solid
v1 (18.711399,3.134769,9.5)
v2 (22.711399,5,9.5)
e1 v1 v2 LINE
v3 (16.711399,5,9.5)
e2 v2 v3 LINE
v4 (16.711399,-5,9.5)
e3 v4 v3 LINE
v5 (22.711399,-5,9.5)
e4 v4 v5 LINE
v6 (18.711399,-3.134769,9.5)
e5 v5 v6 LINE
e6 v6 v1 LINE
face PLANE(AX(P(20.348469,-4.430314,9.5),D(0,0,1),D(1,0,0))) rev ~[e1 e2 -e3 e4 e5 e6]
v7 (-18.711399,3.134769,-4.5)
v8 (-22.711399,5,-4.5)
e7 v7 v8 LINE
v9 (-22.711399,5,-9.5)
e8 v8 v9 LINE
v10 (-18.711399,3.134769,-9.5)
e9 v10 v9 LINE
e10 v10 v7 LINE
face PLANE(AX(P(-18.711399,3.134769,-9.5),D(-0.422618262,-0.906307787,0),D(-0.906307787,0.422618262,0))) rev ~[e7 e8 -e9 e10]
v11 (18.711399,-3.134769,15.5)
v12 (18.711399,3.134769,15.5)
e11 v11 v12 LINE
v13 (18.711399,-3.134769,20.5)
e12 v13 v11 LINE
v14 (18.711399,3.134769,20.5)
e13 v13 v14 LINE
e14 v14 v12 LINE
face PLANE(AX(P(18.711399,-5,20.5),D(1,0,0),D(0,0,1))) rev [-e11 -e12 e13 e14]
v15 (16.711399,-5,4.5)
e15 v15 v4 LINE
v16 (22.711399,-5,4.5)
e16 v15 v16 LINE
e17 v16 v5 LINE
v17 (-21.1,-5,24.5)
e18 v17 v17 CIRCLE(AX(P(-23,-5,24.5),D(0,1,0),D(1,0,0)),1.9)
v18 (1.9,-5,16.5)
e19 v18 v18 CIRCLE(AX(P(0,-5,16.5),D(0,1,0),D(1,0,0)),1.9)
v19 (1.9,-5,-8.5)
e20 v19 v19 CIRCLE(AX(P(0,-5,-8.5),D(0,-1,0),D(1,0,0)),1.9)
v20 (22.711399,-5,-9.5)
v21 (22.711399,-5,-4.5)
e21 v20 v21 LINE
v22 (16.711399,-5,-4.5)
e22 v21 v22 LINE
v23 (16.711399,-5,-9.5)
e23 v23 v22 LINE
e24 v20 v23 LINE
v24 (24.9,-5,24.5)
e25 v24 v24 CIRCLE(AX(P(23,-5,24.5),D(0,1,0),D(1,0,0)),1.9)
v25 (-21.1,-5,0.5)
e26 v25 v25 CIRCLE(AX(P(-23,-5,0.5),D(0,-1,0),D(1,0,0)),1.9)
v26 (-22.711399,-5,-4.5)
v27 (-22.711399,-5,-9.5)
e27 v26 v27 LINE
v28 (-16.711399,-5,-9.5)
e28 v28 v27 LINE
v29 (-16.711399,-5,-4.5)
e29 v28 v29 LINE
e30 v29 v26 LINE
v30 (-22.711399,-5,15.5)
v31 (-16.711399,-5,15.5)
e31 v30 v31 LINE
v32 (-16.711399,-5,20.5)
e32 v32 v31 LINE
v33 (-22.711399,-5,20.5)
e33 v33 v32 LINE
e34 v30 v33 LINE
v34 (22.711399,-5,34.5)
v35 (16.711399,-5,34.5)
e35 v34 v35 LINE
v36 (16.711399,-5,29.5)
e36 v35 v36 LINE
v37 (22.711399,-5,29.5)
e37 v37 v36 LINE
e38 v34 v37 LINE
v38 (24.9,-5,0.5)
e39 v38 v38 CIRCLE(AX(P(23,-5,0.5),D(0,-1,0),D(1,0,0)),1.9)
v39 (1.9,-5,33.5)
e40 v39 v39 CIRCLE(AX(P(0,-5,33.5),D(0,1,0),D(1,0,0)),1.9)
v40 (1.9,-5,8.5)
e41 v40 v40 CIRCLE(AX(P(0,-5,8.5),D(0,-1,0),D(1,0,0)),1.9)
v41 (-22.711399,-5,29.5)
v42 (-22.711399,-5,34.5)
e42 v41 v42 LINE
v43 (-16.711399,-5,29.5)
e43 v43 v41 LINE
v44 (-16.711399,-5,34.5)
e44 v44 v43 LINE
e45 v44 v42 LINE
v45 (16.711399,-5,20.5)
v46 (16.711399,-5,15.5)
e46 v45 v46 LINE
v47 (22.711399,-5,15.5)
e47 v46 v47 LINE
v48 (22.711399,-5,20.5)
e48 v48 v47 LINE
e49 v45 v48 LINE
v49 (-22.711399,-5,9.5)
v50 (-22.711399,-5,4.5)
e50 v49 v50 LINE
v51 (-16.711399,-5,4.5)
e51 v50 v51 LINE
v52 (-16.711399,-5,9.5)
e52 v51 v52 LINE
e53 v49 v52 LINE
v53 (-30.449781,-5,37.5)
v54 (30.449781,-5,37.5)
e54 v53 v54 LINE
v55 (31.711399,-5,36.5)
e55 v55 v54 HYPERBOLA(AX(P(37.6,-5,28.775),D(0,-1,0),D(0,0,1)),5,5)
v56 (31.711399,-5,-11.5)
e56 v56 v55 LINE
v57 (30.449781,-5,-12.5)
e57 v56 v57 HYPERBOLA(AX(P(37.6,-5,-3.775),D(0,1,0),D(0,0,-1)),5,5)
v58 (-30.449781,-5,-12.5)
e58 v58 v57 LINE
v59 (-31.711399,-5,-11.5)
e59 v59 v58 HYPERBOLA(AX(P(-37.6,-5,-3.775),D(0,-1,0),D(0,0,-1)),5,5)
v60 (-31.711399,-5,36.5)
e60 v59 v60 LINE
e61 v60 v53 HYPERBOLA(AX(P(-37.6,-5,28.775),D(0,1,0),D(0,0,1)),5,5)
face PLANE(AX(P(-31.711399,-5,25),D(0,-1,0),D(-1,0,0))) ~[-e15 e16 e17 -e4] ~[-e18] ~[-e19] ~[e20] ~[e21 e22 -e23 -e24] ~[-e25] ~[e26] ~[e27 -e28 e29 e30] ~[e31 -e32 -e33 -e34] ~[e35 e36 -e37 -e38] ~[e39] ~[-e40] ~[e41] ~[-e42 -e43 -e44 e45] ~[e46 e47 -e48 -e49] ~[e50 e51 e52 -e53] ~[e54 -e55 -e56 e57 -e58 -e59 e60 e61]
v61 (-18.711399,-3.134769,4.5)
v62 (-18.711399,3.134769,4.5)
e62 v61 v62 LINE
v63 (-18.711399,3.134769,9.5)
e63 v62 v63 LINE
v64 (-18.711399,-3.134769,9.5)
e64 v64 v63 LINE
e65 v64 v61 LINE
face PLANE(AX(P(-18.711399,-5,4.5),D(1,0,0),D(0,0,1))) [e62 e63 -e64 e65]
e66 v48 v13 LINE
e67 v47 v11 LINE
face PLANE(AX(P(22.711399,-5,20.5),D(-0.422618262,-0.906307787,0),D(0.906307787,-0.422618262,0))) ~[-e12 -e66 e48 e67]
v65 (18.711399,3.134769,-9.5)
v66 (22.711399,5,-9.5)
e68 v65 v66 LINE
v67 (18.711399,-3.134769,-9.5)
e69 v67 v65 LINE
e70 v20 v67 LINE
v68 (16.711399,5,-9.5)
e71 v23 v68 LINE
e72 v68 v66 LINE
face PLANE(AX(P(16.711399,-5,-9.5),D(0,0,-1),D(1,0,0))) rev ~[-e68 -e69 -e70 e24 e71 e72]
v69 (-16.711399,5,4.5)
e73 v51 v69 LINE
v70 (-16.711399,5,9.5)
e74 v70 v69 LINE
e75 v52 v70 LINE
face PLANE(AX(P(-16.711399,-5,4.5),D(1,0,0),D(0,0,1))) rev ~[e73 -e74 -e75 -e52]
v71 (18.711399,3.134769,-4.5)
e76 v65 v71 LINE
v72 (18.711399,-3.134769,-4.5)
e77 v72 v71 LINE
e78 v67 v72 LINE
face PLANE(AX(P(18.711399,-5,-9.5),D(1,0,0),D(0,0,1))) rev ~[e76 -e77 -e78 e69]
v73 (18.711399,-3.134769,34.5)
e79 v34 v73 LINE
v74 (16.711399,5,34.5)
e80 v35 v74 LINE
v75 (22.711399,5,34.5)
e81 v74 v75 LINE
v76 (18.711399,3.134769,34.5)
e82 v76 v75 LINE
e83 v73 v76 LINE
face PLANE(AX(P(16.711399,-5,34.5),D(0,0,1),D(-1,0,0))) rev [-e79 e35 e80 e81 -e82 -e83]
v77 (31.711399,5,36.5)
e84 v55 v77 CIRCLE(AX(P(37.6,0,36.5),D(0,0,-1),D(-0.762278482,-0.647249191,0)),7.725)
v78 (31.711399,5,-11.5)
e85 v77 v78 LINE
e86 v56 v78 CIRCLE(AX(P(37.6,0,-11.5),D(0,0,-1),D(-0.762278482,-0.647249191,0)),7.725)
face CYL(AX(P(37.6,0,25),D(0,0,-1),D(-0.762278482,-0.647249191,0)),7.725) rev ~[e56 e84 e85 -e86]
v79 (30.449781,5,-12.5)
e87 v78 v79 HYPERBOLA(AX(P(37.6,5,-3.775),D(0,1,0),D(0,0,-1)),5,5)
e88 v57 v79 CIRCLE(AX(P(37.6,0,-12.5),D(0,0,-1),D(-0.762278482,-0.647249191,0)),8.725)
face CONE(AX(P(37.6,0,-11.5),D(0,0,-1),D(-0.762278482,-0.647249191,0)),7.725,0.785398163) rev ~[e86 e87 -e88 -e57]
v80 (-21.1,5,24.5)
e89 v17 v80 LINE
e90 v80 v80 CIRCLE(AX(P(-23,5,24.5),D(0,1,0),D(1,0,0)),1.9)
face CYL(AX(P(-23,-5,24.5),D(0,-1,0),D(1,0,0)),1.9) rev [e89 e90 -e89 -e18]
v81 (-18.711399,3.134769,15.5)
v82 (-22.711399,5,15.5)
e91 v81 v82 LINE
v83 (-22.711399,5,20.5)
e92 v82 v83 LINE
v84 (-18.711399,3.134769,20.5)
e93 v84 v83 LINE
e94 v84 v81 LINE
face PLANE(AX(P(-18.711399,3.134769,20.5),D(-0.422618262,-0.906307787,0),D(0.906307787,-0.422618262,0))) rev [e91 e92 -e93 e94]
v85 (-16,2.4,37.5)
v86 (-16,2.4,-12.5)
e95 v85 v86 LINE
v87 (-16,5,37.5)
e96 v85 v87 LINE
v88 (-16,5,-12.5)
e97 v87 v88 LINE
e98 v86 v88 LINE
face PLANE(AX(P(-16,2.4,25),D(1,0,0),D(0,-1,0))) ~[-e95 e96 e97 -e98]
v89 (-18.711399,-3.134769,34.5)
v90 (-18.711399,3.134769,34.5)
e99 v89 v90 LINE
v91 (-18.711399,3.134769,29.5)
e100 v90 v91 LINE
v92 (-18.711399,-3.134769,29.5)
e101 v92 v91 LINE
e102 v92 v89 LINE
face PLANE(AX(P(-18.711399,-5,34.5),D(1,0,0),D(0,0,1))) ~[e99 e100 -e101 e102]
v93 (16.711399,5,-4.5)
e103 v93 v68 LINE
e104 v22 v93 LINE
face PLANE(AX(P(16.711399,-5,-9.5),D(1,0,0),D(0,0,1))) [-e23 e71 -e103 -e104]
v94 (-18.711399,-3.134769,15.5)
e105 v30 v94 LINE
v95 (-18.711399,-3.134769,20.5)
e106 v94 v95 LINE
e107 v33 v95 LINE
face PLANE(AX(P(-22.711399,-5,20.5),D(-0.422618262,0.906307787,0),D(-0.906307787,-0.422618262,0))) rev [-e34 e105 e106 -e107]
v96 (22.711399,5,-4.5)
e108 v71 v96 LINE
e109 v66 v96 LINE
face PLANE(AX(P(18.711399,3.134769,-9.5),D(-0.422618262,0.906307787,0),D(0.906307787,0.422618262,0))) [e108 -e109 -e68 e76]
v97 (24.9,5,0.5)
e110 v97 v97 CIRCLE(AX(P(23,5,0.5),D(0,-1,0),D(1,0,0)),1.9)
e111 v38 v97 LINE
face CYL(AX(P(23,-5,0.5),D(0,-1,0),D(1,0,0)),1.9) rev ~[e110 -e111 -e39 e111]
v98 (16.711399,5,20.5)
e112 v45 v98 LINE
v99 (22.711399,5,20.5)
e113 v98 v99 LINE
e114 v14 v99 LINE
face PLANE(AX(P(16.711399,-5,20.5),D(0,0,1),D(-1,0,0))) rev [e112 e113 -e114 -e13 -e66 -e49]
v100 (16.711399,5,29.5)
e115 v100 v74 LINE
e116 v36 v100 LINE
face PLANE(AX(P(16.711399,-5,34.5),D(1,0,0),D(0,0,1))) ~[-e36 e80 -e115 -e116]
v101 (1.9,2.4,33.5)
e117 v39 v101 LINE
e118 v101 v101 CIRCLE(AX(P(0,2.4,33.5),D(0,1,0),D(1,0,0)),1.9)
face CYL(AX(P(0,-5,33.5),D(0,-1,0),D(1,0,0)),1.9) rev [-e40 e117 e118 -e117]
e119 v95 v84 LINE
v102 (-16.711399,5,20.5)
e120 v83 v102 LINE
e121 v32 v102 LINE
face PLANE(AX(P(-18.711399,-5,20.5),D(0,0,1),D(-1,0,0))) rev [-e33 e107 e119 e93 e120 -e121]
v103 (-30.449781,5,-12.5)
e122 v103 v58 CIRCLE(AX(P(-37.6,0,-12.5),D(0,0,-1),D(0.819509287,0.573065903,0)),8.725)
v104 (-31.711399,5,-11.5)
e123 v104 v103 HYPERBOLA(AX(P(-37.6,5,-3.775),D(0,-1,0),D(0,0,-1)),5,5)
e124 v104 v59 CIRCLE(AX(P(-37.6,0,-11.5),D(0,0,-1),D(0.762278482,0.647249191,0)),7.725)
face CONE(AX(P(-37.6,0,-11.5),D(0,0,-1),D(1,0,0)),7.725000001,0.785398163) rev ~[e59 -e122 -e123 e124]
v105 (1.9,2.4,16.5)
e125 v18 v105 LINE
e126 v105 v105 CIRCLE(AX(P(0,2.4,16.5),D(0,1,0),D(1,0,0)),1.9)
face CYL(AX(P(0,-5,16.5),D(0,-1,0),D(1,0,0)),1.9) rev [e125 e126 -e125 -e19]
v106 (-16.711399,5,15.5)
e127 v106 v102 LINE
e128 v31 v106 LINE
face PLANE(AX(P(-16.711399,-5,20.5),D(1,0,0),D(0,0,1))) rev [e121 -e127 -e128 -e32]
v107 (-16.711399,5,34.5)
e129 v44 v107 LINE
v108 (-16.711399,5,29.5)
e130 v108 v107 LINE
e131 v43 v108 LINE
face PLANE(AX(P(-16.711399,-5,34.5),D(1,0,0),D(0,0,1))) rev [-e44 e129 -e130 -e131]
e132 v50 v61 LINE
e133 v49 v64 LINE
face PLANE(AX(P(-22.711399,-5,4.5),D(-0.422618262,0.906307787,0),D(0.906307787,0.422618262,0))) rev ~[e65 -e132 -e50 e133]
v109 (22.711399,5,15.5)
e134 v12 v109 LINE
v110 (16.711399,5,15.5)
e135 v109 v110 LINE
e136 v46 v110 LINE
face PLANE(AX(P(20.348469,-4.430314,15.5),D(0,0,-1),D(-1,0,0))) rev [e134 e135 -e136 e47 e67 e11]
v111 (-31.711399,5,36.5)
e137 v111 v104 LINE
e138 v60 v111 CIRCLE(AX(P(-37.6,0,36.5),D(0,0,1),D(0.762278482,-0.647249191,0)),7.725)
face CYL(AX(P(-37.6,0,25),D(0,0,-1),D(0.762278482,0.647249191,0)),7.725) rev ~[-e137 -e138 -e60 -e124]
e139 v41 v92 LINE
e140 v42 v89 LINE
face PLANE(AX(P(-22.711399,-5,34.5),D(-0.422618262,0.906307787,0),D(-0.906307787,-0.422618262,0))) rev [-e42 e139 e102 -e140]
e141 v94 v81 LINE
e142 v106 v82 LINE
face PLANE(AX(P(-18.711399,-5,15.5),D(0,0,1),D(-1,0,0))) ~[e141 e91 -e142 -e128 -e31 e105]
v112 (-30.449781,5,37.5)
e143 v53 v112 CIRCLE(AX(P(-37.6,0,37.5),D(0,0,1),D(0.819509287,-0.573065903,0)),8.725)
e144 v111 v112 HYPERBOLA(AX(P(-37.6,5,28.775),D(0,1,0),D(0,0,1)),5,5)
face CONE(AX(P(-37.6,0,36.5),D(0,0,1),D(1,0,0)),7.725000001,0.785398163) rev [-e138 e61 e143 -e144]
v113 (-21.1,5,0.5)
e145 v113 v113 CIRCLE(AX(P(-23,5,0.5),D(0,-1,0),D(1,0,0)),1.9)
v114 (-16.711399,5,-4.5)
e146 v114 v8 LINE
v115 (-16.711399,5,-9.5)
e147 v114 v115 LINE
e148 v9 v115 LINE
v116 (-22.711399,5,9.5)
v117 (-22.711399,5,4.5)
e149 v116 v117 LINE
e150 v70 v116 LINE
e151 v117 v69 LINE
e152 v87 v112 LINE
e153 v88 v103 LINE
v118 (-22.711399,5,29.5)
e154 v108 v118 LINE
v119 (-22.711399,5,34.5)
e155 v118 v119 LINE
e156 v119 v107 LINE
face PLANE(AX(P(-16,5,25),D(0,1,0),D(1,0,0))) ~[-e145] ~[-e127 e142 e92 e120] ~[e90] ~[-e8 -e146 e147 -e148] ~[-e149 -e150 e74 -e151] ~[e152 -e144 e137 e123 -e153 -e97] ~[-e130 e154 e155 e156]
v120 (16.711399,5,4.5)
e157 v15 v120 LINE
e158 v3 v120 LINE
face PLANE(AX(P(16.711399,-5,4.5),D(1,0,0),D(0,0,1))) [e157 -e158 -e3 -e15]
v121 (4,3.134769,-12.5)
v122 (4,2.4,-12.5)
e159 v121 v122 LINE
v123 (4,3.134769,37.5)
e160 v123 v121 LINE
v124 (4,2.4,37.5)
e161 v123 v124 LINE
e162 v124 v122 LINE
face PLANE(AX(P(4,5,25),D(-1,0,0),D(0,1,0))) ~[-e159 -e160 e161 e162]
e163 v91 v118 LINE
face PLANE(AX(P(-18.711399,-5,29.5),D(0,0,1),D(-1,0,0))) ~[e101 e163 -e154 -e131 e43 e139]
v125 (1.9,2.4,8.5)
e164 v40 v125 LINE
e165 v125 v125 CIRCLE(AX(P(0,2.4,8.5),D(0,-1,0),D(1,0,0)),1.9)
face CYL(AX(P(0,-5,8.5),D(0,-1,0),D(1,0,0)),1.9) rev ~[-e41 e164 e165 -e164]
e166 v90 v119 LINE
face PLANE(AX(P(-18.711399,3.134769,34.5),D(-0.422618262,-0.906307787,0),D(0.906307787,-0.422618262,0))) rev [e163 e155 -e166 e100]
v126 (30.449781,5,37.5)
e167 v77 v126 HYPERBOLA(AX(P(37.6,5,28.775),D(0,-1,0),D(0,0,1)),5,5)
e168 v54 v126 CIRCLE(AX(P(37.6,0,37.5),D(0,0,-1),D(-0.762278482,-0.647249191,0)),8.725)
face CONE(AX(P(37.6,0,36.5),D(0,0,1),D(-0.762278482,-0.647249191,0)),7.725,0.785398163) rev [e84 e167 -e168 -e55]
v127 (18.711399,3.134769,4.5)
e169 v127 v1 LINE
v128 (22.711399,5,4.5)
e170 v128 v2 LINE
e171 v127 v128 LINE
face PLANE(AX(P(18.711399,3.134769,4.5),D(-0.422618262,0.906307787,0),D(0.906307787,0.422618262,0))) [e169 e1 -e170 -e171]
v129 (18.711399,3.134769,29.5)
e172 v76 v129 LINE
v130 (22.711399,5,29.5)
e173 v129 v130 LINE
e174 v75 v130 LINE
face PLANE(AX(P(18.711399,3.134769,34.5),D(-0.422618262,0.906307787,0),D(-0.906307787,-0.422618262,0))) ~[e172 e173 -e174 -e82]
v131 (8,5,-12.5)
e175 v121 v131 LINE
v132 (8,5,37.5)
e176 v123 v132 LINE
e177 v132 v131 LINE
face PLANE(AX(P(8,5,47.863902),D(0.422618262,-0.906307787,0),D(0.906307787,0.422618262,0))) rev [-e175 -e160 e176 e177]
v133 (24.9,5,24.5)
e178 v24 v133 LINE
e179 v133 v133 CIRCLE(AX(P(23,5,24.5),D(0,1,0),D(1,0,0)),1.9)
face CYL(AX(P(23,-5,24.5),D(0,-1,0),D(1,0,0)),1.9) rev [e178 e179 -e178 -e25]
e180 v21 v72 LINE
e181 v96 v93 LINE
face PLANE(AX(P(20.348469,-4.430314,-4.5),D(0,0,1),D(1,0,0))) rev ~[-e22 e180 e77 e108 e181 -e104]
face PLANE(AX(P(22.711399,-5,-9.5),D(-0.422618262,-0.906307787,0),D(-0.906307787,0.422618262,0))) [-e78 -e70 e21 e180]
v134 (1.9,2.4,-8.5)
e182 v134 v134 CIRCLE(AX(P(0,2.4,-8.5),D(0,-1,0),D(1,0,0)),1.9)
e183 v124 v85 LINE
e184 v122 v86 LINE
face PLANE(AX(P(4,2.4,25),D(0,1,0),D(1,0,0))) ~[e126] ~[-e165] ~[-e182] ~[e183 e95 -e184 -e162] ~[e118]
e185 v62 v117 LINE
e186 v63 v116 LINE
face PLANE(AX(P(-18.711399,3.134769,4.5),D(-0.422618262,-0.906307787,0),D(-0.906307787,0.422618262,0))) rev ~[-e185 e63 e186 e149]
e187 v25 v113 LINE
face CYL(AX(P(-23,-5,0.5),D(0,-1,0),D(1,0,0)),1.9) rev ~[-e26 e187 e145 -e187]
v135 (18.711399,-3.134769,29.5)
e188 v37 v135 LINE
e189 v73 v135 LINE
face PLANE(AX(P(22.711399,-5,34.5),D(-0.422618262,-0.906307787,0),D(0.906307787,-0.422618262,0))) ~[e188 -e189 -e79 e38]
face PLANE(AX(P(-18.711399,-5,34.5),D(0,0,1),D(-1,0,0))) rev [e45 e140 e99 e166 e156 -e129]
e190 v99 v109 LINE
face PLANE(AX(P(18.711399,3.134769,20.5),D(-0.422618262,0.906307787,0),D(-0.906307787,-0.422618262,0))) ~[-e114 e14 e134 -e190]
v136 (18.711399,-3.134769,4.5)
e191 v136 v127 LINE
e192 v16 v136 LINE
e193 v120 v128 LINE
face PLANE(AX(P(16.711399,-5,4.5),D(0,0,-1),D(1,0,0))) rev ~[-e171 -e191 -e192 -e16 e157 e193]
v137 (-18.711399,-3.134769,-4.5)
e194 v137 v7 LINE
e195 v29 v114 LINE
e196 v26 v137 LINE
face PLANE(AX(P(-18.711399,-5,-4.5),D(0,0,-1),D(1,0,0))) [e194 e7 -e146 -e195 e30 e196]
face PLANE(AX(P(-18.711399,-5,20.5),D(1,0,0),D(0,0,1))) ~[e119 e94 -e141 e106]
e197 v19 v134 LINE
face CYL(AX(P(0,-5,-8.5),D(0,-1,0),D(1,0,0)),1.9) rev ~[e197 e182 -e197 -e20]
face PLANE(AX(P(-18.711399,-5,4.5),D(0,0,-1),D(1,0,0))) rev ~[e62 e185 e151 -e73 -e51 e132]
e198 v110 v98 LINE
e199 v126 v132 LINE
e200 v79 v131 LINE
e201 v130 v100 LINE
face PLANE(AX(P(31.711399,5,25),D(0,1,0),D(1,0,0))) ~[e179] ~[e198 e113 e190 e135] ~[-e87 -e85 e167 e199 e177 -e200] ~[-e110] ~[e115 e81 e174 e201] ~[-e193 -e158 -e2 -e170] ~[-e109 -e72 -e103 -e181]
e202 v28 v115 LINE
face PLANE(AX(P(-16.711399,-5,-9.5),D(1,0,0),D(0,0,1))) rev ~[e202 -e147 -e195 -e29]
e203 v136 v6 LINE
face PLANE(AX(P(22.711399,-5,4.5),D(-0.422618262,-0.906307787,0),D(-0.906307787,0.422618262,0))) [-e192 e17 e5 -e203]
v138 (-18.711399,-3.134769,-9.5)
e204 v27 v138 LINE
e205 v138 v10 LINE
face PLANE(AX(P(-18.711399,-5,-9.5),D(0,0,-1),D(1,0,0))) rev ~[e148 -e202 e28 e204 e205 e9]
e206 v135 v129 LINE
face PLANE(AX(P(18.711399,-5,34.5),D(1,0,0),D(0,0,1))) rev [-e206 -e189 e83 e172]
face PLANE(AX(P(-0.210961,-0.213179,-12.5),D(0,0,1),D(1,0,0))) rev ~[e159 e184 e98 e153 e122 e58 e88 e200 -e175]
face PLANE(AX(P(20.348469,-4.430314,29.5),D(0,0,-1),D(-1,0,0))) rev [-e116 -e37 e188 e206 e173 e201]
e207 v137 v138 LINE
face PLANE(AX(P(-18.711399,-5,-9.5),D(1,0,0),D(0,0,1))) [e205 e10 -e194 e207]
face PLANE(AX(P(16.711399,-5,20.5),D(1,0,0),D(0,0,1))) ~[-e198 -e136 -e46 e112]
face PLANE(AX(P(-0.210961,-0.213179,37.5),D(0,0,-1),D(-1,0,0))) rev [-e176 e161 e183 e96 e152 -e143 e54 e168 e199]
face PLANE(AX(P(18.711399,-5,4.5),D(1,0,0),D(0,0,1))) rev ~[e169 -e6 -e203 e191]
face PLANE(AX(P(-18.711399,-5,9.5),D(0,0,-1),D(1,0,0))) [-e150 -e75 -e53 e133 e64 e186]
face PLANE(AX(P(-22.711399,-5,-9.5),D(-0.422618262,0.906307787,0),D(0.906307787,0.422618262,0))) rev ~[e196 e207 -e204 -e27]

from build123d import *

# Parameters (mm, degrees)
F1_DEPTH     = 12.5
F2_R         = 1.9
F2_W         = 2
F2_H         = 5
F3_DEPTH     = 25
F5_T1_DEPTH  = 5
F5_T3_DEPTH  = 5
F5_T5_DEPTH  = 22.8639018857
F5_T7_DEPTH  = 22.8639018857
F5_T12_DEPTH = 25.7278037714
F5_T17_DEPTH = 25.7278037714
F5_T22_DEPTH = 25.7278037714
F5_T27_DEPTH = 25.7278037714
F5_T32_DEPTH = 25.7278037714
F5_T37_DEPTH = 25.7278037714
F5_T42_DEPTH = 25.7278037714
F5_T47_DEPTH = 25.7278037714
F10_SIZE     = 1


# Not quite as in the source:
# - a fillet or chamfer that OpenCascade refuses, or shapes differently, is made with other operations: its cross-section is extruded or revolved along the edge and cut away or added
# - two fillets or chamfers of one size are made in one step


with BuildPart() as f1:
    # F0 (on Top) → F1 (new body, symmetric)
    with BuildSketch(Plane.XY):
        with BuildLine():
            ThreePointArc((-31.711398723, 5), (-30.3486184122, 2.6632855775), (-29.875, 0))
            ThreePointArc((-29.875, 0), (-30.3486184122, -2.6632855775), (-31.711398723, -5))
            Line((-31.711398723, -5), (31.711398723, -5))
            ThreePointArc((31.711398723, -5), (29.875, 0), (31.711398723, 5))
            Line((31.711398723, 5), (4, 5))
            Line((4, 5), (4, 2.4))
            Line((4, 2.4), (-16, 2.4))
            Line((-16, 2.4), (-16, 5))
            Line((-16, 5), (-31.711398723, 5))
        make_face()
    extrude(amount=F1_DEPTH, both=True)

    # F2 (on face) → F3 (cut)
    with BuildSketch(Plane.XZ.offset(5)):
        with Locations((0, 8.5)):
            Circle(F2_R)
        with Locations((0, -8.5)):
            Circle(F2_R)
        with Locations((-17.711398723, 7)):
            Rectangle(F2_W, F2_H)
        with Locations((-17.711398723, -7)):
            Rectangle(F2_W, F2_H)
        with Locations((17.711398723, 7)):
            Rectangle(F2_W, F2_H)
        with Locations((17.711398723, -7)):
            Rectangle(F2_W, F2_H)
        with Locations((-23, 0.5)):
            Circle(F2_R)
        with Locations((23, 0.5)):
            Circle(F2_R)
    extrude(amount=-F3_DEPTH, mode=Mode.SUBTRACT)

    # F5: chamfer of 4 x 1.8652306326 on 10 edges, made by hand

    # F5_s2 → F5_t1 (cut)
    with BuildSketch(Plane.XY.offset(-9.5)):
        Polygon((22.711398723, -5), (18.711398723, -3.1347693674), (18.711398723, -5), align=None)
        Polygon((-22.711398723, -5), (-18.711398723, -3.1347693674), (-18.711398723, -5), align=None)
        Polygon((-18.711398723, 3.1347693674), (-22.711398723, 5), (-18.711398723, 5), align=None)
        Polygon((18.711398723, 3.1347693674), (22.711398723, 5), (18.711398723, 5), align=None)
    extrude(amount=F5_T1_DEPTH, mode=Mode.SUBTRACT)

    # F5_s4 → F5_t3 (cut)
    with BuildSketch(Plane.XY.offset(4.5)):
        Polygon((22.711398723, -5), (18.711398723, -3.1347693674), (18.711398723, -5), align=None)
        Polygon((-22.711398723, -5), (-18.711398723, -3.1347693674), (-18.711398723, -5), align=None)
        Polygon((-18.711398723, 3.1347693674), (-22.711398723, 5), (-18.711398723, 5), align=None)
        Polygon((18.711398723, 3.1347693674), (22.711398723, 5), (18.711398723, 5), align=None)
    extrude(amount=F5_T3_DEPTH, mode=Mode.SUBTRACT)

    # F5_s6 → F5_t5 (cut)
    with BuildSketch(Plane.XY.offset(-22.8639018857)):
        Polygon((8, 5), (4, 3.1347693674), (4, 5), align=None)
    extrude(amount=F5_T5_DEPTH, mode=Mode.SUBTRACT)

    # F5_s8 → F5_t7 (cut)
    with BuildSketch(Plane.XY):
        Polygon((8, 5), (4, 3.1347693674), (4, 5), align=None)
    extrude(amount=F5_T7_DEPTH, mode=Mode.SUBTRACT)


with BuildPart() as f5_tool10:
    # F5_s11 → F5_t12 (new body)
    with BuildSketch(Plane.XY.offset(-19.8639018857)):
        Polygon((22.711398723, -5), (18.711398723, -3.1347693674), (18.711398723, -5), align=None)
    extrude(amount=F5_T12_DEPTH)

    split(bisect_by=Plane.XY.offset(4.5), keep=Keep.TOP)


with BuildPart() as f1_1:
    add(f1.part)

    # F5_t9: cut F5_tool10
    add(f5_tool10.part, mode=Mode.SUBTRACT)


with BuildPart() as f5_tool15:
    # F5_s16 → F5_t17 (new body)
    with BuildSketch(Plane.XY.offset(-5.8639018857)):
        Polygon((22.711398723, -5), (18.711398723, -3.1347693674), (18.711398723, -5), align=None)
    extrude(amount=F5_T17_DEPTH)

    split(bisect_by=Plane.XY.offset(-4.5), keep=Keep.BOTTOM)


with BuildPart() as f1_2:
    add(f1_1.part)

    # F5_t14: cut F5_tool15
    add(f5_tool15.part, mode=Mode.SUBTRACT)


with BuildPart() as f5_tool20:
    # F5_s21 → F5_t22 (new body)
    with BuildSketch(Plane.XY.offset(5.8639018857)):
        Polygon((-22.711398723, -5), (-18.711398723, -3.1347693674), (-18.711398723, -5), align=None)
    extrude(amount=-F5_T22_DEPTH)

    split(bisect_by=Plane.XY.offset(4.5), keep=Keep.TOP)


with BuildPart() as f1_3:
    add(f1_2.part)

    # F5_t19: cut F5_tool20
    add(f5_tool20.part, mode=Mode.SUBTRACT)


with BuildPart() as f5_tool25:
    # F5_s26 → F5_t27 (new body)
    with BuildSketch(Plane.XY.offset(19.8639018857)):
        Polygon((-22.711398723, -5), (-18.711398723, -3.1347693674), (-18.711398723, -5), align=None)
    extrude(amount=-F5_T27_DEPTH)

    split(bisect_by=Plane.XY.offset(-4.5), keep=Keep.BOTTOM)


with BuildPart() as f1_4:
    add(f1_3.part)

    # F5_t24: cut F5_tool25
    add(f5_tool25.part, mode=Mode.SUBTRACT)


with BuildPart() as f5_tool30:
    # F5_s31 → F5_t32 (new body)
    with BuildSketch(Plane.XY.offset(-19.8639018857)):
        Polygon((-18.711398723, 3.1347693674), (-22.711398723, 5), (-18.711398723, 5), align=None)
    extrude(amount=F5_T32_DEPTH)

    split(bisect_by=Plane.XY.offset(4.5), keep=Keep.TOP)


with BuildPart() as f1_5:
    add(f1_4.part)

    # F5_t29: cut F5_tool30
    add(f5_tool30.part, mode=Mode.SUBTRACT)


with BuildPart() as f5_tool35:
    # F5_s36 → F5_t37 (new body)
    with BuildSketch(Plane.XY.offset(5.8639018857)):
        Polygon((18.711398723, 3.1347693674), (22.711398723, 5), (18.711398723, 5), align=None)
    extrude(amount=-F5_T37_DEPTH)

    split(bisect_by=Plane.XY.offset(4.5), keep=Keep.TOP)


with BuildPart() as f1_6:
    add(f1_5.part)

    # F5_t34: cut F5_tool35
    add(f5_tool35.part, mode=Mode.SUBTRACT)


with BuildPart() as f5_tool40:
    # F5_s41 → F5_t42 (new body)
    with BuildSketch(Plane.XY.offset(19.8639018857)):
        Polygon((-18.711398723, 3.1347693674), (-22.711398723, 5), (-18.711398723, 5), align=None)
    extrude(amount=-F5_T42_DEPTH)

    split(bisect_by=Plane.XY.offset(-4.5), keep=Keep.BOTTOM)


with BuildPart() as f1_7:
    add(f1_6.part)

    # F5_t39: cut F5_tool40
    add(f5_tool40.part, mode=Mode.SUBTRACT)


with BuildPart() as f5_tool45:
    # F5_s46 → F5_t47 (new body)
    with BuildSketch(Plane.XY.offset(-5.8639018857)):
        Polygon((18.711398723, 3.1347693674), (22.711398723, 5), (18.711398723, 5), align=None)
    extrude(amount=F5_T47_DEPTH)

    split(bisect_by=Plane.XY.offset(-4.5), keep=Keep.BOTTOM)


with BuildPart() as f1_8:
    add(f1_7.part)

    # F5_t44: cut F5_tool45
    add(f5_tool45.part, mode=Mode.SUBTRACT)

    # F9: F1 across face


with BuildPart() as f1_9:
    add(f1_8.part)
    add(f1_8.part.mirror(Plane(origin=(0.5278701032, -0.3772073921, 12.5), x_dir=(1, 0, 0), z_dir=(0, 0, 1))))

    # F10
    f10_edges = [f1_9.edges().sort_by_distance(p)[0] for p in [
        (29.875, 0, 37.5),
        (29.875, 0, -12.5),
        (-30.348618, 2.663286, 37.5),
        (-30.348618, -2.663286, 37.5),
        (-30.348618, -2.663286, -12.5),
        (-30.348618, 2.663286, -12.5),
    ]]
    chamfer(f10_edges, length=F10_SIZE)


solid = f1_9.part
